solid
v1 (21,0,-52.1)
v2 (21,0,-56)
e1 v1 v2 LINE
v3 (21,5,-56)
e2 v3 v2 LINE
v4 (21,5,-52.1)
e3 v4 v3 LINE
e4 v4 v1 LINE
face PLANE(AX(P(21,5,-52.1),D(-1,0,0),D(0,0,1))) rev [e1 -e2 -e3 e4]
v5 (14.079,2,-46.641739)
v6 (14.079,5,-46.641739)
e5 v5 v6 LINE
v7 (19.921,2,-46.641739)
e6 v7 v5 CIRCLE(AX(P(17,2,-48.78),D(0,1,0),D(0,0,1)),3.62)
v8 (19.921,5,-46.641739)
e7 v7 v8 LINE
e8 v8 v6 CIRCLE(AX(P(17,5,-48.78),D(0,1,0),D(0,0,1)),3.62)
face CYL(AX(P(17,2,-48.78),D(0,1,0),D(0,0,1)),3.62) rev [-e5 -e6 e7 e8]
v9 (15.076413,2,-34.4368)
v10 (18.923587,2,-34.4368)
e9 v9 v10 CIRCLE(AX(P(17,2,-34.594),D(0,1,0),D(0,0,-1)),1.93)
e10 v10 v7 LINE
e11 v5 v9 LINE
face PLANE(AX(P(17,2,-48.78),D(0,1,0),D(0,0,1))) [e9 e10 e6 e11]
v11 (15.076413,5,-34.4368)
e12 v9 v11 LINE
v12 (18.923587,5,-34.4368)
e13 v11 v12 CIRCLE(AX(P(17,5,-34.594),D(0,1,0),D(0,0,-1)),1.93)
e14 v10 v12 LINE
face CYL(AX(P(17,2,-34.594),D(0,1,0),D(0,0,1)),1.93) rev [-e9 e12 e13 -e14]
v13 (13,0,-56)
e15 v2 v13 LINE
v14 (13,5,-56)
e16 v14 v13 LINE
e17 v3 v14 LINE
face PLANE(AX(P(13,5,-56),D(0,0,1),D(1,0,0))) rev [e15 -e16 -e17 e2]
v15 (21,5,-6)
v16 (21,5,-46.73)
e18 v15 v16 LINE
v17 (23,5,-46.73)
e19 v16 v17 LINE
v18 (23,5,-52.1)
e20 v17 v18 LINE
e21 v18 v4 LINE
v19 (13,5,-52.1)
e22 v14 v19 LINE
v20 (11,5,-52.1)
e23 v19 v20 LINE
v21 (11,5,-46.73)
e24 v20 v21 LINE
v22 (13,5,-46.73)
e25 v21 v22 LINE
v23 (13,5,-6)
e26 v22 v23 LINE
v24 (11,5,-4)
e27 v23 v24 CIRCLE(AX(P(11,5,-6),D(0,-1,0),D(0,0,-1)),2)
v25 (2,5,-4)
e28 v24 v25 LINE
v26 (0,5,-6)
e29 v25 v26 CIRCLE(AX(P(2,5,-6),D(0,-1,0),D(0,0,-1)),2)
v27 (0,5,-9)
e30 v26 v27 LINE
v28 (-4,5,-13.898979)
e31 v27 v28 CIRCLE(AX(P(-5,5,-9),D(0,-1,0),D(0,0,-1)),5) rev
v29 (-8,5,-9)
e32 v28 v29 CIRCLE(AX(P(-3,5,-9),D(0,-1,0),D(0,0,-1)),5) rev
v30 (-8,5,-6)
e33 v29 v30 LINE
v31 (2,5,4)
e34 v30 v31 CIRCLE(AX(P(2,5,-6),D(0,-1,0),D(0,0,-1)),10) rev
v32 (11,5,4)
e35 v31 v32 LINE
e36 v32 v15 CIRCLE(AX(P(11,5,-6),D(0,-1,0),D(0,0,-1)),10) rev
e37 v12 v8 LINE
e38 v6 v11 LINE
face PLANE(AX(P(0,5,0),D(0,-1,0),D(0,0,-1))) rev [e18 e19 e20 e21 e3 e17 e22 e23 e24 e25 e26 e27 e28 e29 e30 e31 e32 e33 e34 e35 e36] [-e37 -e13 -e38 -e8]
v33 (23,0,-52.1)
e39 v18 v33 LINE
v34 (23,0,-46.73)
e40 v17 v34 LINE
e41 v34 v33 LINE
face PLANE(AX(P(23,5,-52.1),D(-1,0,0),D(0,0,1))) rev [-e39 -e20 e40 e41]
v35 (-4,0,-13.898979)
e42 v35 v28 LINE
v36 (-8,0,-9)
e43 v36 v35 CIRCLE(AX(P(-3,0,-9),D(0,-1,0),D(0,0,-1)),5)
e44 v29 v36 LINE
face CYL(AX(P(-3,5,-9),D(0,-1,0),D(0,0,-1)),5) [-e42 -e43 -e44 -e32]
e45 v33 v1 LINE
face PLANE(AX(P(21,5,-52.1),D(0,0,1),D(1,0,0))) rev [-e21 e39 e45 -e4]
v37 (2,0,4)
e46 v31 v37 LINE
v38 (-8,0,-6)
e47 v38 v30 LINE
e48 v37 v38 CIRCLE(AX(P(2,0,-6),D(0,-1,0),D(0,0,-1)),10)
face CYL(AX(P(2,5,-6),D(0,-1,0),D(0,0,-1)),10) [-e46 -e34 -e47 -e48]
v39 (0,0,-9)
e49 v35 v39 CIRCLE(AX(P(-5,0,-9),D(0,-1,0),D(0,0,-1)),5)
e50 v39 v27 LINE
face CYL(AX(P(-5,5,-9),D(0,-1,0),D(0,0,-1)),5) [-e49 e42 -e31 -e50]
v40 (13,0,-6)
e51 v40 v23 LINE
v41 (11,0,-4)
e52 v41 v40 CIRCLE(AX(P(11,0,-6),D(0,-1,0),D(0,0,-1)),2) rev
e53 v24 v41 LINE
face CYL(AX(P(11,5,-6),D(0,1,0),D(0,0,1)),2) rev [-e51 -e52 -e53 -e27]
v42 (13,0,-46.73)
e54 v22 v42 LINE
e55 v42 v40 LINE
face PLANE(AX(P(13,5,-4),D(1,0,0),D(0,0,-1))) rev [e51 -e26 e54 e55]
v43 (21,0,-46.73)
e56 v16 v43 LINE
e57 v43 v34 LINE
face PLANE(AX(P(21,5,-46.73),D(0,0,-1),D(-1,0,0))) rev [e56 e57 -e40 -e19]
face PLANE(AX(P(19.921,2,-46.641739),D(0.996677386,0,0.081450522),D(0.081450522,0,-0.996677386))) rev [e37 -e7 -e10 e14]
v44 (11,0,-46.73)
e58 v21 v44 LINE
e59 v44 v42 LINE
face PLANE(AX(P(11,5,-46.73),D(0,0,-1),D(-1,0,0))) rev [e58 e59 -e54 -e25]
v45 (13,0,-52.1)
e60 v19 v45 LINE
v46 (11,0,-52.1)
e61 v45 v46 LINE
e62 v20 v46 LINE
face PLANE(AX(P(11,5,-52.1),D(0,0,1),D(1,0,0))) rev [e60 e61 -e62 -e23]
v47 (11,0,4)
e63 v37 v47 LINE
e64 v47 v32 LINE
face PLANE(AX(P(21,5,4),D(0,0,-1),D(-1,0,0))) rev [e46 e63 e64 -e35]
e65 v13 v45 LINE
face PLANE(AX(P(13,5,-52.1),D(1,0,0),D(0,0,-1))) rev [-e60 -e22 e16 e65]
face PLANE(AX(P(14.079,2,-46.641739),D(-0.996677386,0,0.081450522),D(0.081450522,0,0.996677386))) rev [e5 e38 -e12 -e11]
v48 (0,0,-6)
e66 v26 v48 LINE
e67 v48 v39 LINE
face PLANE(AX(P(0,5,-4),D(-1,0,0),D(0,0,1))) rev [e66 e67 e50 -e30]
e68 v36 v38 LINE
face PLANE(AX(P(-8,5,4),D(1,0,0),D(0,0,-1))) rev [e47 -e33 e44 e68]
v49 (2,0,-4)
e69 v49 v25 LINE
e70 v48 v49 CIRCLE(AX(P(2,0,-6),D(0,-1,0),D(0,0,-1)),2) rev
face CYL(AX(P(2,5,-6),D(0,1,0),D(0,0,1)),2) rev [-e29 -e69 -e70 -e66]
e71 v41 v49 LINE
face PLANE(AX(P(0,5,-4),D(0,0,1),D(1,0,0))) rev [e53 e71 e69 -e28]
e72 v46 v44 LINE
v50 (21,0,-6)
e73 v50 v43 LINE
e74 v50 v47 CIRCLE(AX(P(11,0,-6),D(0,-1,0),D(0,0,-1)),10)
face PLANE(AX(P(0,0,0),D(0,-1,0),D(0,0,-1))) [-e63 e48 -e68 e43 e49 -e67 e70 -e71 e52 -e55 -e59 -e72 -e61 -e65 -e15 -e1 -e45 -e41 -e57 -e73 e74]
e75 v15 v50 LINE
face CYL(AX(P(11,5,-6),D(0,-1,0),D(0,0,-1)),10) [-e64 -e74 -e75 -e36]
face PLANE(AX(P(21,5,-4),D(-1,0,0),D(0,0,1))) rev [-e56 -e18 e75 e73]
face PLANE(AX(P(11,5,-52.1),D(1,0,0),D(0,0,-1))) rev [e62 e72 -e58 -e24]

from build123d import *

# Parameters (mm, degrees)
BOSS_EXTRUDE1_DEPTH = 5
CUT_EXTRUDE3_DEPTH  = 3
FILLET2_R           = 10
FILLET3_R           = 5
FILLET4_R           = 2


with BuildPart() as part:
    # Sketch1 → Boss-Extrude1 (new body)
    with BuildSketch(Plane(origin=(0, 0, 0), x_dir=(1, 0, 0), z_dir=(0, 1, 0))):
        Polygon((0, 4), (13, 4), (13, 46.73), (11, 46.73), (11, 52.1), (13, 52.1), (13, 56), (21, 56), (21, 52.1), (23, 52.1), (23, 46.73), (21, 46.73), (21, 4), (21, -4), (13, -4), (0, -4), (-8, -4), (-8, 14), (0, 14), align=None)
    extrude(amount=BOSS_EXTRUDE1_DEPTH)

    # Sketch2 → Cut-Extrude3 (cut)
    with BuildSketch(Plane(origin=(0, 5, 0), x_dir=(1, 0, 0), z_dir=(0, 1, 0))):
        with BuildLine():
            Line((19.921, 46.641739258), (18.923587356, 34.436800493))
            ThreePointArc((18.923587356, 34.436800493), (17, 32.664), (15.076412644, 34.436800493))
            Line((15.076412644, 34.436800493), (14.079, 46.641739258))
            ThreePointArc((14.079, 46.641739258), (17, 52.4), (19.921, 46.641739258))
        make_face()
    extrude(amount=-CUT_EXTRUDE3_DEPTH, mode=Mode.SUBTRACT)

    # Fillet2
    fillet2_edges = [part.edges().sort_by_distance(p)[0] for p in [
        (21, 2.5, 4),
        (-8, 2.5, 4),
    ]]
    fillet(fillet2_edges, radius=FILLET2_R)

    # Fillet3
    # the kernel refuses this fillet: 5 mm, written as the material it takes off along each edge
    with BuildSketch(Plane(origin=(0, -12.5, -14), x_dir=(-1, 0, 0), z_dir=(0, 1, 0)), Plane(origin=(-8, -12.5, -14), x_dir=(0, 0, 1), z_dir=(0, 1, 0))) as fillet3_piece_1:
        with BuildLine():
            CenterArc((FILLET3_R, FILLET3_R), FILLET3_R, 180, 90)
            Line((0, FILLET3_R), (0, 0))
            Line((0, 0), (FILLET3_R, 0))
        make_face()
    extrude(amount=30, mode=Mode.SUBTRACT)

    # Fillet4
    fillet4_edges = [part.edges().sort_by_distance(p)[0] for p in [
        (0, 2.5, -4),
        (13, 2.5, -4),
    ]]
    fillet(fillet4_edges, radius=FILLET4_R)


solid = part.part
